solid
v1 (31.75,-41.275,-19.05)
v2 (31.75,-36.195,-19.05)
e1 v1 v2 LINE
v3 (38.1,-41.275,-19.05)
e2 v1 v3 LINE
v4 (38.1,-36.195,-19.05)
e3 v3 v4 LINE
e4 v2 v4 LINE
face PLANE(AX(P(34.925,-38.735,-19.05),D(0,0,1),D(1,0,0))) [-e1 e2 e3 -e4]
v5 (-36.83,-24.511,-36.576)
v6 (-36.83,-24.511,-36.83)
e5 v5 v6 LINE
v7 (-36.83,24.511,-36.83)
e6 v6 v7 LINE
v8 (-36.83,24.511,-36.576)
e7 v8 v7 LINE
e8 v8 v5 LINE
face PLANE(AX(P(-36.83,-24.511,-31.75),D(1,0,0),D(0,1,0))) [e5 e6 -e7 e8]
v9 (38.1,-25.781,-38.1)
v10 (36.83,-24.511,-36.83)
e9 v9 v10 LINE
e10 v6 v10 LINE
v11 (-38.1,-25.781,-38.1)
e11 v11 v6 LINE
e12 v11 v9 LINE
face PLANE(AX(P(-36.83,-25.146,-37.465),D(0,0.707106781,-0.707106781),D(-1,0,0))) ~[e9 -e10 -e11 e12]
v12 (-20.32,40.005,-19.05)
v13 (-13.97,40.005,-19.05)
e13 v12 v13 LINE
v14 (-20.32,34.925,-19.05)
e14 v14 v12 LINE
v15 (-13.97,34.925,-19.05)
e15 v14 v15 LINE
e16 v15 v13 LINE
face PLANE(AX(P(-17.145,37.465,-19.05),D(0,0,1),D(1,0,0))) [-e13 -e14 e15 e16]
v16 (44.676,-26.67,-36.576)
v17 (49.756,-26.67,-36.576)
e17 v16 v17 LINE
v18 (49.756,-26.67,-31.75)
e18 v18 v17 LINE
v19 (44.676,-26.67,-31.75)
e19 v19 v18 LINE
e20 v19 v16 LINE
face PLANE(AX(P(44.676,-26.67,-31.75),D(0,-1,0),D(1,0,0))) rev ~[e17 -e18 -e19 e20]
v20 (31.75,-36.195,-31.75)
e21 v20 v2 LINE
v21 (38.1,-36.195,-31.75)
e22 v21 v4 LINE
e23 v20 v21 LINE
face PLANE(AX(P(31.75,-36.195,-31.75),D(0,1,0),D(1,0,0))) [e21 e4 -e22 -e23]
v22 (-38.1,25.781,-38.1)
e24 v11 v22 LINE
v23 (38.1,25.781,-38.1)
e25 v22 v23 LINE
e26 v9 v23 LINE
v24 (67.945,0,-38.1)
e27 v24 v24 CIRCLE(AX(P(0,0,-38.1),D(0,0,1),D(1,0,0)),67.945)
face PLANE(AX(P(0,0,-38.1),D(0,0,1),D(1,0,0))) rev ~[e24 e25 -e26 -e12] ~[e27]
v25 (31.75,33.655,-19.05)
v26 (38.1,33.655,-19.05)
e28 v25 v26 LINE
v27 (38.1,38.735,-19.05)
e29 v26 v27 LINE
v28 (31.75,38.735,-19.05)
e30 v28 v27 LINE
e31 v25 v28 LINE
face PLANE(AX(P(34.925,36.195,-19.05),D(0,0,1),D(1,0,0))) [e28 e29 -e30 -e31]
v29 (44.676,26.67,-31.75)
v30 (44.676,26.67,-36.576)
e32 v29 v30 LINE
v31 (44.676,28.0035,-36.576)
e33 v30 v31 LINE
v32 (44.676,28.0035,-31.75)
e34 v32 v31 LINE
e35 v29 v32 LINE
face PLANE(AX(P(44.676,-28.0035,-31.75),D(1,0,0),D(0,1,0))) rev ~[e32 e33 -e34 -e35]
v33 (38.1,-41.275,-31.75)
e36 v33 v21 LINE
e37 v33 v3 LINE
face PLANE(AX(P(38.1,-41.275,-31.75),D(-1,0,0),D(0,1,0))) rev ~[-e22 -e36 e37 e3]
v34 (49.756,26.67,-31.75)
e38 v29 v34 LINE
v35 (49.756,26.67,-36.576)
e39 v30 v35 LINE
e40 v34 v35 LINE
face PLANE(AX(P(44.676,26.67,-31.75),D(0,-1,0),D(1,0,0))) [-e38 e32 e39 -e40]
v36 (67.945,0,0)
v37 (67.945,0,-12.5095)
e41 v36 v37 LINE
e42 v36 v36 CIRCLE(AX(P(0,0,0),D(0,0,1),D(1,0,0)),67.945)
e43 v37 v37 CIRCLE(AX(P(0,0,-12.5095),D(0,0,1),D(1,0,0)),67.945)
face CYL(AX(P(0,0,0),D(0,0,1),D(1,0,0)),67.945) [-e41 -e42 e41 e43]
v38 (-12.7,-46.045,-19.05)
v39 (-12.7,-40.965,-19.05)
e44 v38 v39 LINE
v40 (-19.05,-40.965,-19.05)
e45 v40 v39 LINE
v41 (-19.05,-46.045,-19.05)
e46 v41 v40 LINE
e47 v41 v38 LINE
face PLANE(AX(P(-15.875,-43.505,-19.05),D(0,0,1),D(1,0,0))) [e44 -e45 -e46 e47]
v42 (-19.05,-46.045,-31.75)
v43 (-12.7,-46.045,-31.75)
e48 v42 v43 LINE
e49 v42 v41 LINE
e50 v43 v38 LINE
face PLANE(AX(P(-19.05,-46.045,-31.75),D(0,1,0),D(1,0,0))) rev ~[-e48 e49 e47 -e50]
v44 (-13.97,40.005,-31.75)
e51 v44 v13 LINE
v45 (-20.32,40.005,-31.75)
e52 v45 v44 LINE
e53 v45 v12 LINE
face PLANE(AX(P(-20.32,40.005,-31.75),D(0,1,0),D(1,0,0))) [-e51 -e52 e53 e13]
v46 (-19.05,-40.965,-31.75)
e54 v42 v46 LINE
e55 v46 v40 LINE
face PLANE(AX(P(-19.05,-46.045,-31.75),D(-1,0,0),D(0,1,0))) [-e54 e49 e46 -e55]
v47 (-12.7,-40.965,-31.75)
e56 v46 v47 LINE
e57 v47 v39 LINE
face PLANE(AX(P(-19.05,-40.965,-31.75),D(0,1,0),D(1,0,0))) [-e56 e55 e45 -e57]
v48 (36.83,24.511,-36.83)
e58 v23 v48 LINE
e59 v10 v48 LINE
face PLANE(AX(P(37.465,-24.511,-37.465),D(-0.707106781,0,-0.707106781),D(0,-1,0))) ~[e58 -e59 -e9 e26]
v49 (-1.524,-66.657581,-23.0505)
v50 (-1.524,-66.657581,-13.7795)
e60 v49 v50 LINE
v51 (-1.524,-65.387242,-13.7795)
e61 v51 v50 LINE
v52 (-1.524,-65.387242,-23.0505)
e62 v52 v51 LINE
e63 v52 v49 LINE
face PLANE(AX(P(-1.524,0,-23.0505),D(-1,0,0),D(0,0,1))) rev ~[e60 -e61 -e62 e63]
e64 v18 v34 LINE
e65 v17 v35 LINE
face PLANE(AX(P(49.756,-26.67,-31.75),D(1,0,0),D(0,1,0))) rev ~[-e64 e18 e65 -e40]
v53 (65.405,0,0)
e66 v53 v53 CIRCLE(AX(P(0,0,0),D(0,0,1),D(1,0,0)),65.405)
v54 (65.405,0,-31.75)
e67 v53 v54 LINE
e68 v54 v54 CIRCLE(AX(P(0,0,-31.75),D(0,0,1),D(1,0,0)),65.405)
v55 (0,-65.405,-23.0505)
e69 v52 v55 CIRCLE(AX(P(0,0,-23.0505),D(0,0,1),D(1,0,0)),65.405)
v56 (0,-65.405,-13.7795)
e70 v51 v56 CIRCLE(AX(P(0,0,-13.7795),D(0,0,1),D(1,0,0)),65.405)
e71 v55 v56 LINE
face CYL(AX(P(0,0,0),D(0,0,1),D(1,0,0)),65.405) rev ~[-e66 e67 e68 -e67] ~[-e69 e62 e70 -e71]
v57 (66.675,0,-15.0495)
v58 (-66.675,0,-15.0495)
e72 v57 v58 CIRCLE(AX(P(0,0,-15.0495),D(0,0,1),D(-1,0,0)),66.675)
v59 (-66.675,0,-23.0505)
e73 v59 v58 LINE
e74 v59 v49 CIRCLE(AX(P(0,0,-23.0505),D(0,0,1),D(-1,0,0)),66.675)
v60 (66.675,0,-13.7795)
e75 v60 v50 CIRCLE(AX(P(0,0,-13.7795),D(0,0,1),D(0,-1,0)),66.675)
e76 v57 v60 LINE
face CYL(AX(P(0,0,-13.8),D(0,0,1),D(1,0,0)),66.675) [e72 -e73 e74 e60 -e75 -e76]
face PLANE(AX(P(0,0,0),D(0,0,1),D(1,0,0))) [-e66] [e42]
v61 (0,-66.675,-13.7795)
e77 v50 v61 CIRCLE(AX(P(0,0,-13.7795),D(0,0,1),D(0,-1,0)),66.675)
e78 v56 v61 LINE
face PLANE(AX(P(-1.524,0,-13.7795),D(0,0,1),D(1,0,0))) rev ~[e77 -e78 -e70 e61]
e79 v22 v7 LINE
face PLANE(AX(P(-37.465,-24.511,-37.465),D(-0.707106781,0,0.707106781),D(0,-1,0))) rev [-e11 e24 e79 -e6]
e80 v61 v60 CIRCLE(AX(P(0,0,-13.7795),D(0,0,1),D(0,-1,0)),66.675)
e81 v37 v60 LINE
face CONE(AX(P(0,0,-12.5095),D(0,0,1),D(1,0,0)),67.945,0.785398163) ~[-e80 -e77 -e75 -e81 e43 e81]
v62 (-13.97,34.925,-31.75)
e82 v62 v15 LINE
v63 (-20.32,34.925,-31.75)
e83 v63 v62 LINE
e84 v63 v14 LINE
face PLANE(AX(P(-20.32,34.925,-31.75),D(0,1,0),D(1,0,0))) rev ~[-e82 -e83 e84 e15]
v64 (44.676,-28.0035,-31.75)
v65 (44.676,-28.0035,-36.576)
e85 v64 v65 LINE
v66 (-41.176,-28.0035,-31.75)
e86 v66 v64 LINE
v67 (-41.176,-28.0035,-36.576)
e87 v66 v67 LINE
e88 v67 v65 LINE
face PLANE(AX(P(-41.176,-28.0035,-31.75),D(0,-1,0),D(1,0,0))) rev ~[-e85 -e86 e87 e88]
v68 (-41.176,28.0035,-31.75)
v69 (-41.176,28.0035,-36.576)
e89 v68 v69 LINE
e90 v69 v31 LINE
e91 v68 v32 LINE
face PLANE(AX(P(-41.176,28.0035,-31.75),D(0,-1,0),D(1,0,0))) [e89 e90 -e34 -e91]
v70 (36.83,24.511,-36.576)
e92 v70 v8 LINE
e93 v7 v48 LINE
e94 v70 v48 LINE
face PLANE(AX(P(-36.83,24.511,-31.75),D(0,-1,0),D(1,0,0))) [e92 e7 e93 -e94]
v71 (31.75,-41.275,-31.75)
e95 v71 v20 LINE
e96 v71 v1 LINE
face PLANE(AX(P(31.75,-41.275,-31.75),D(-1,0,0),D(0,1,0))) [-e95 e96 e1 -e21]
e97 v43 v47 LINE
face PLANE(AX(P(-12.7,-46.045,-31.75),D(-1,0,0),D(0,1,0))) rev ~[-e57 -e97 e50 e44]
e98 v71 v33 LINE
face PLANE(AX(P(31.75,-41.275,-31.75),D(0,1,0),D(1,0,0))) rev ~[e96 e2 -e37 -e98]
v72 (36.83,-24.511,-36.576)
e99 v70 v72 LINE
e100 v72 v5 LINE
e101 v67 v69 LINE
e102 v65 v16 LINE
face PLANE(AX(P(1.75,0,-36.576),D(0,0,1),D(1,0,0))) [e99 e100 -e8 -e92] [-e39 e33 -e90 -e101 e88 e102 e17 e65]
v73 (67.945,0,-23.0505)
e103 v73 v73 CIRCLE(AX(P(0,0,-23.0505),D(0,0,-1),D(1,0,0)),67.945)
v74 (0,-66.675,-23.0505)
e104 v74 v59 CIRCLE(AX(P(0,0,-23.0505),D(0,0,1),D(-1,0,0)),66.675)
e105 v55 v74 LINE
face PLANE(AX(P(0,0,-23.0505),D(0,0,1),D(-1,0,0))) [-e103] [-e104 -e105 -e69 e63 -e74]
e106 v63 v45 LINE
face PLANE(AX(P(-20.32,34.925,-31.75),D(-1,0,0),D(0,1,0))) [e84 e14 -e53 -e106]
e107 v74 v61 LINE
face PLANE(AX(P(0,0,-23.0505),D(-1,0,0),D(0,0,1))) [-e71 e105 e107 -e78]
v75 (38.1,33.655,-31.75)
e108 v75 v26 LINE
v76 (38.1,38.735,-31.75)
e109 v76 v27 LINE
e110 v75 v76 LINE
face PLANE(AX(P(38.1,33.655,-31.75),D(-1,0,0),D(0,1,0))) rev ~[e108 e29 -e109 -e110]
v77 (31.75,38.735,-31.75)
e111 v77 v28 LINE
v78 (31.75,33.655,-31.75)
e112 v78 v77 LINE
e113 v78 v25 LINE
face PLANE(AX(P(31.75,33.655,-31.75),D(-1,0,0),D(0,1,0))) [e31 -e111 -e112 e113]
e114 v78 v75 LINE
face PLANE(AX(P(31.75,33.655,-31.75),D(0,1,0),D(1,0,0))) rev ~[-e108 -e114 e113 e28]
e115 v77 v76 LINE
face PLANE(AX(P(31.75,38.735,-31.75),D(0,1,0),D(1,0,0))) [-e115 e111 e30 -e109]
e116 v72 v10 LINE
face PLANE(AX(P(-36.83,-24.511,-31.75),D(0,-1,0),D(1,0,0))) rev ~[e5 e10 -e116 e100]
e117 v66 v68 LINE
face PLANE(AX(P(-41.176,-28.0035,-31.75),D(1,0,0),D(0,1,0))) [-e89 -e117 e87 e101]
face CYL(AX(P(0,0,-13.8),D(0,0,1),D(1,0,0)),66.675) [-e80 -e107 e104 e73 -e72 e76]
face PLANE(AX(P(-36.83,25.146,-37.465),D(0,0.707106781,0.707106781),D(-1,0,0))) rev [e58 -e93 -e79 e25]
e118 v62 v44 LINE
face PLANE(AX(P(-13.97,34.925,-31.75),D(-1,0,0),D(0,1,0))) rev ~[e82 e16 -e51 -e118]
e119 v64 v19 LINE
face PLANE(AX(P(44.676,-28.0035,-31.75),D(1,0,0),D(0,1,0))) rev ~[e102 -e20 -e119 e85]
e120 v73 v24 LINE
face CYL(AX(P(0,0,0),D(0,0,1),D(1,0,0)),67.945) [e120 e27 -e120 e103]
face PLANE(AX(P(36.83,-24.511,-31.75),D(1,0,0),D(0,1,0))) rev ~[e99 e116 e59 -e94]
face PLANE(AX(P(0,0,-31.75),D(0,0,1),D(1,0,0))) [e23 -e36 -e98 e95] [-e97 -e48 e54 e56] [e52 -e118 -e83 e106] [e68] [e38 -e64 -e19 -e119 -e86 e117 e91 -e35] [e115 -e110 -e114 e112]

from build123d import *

# Parameters (mm, degrees)
F0_R        = 67.945
F1_DEPTH    = 38.1
F2_R        = 65.405
F3_DEPTH    = 31.75
F5_W        = 2.54
F5_H        = 8.001
F7_S5_R     = 66.675
F7_T6_DEPTH = 98
F8_W        = 73.66
F8_H        = 49.022
F9_DEPTH    = 6.351
F10_W       = 85.852
F10_H       = 56.007
F11_DEPTH   = 4.826
F12_W       = 5.08
F12_H       = 53.34
F13_DEPTH   = 4.826
F14_SIZE    = 1.27
F15_W       = 1.524
F15_H       = 9.271
F16_DEPTH   = 67.946
F17_W       = 6.35
F17_H       = 5.08
F18_DEPTH   = 12.7


# Not quite as in the source:
# - a fillet or chamfer that OpenCascade refuses, or shapes differently, is made with other operations: its cross-section is extruded or revolved along the edge and cut away or added


with BuildPart() as f1:
    # F0 (on Top) → F1 (new body)
    with BuildSketch(Plane.XY):
        Circle(F0_R)
    extrude(amount=-F1_DEPTH)

    # F2 (on face) → F3 (cut)
    with BuildSketch(Plane.XY):
        Circle(F2_R)
    extrude(amount=-F3_DEPTH, mode=Mode.SUBTRACT)

    # F5 (on Front) → F6 (revolve, cut)
    with BuildSketch(Plane.XZ):
        with Locations((-67.945, -19.05)):
            Rectangle(F5_W, F5_H)
    revolve(axis=Axis((0, 0, 0), (0, 0, 1)), mode=Mode.SUBTRACT)

    # F7: chamfer of 2.54 on 1 edges, made by hand


with BuildPart() as f7_tool2:
    # F7_s3 → F7_t4 (revolve)
    with BuildSketch(Plane.XZ):
        Polygon((67.945, -12.5095), (65.405, -15.0495), (67.945, -15.0495), align=None)
    revolve(axis=Axis((0, 0, -15.0495), (0, 0, 1)))

    # F7_s5 → F7_t6 (cut, symmetric)
    with BuildSketch(Plane.XY.offset(-13.8)):
        Circle(F7_S5_R)
    extrude(amount=F7_T6_DEPTH, both=True, mode=Mode.SUBTRACT)


with BuildPart() as f1_1:
    add(f1.part)

    # F7_t1: cut F7_tool2
    add(f7_tool2.part, mode=Mode.SUBTRACT)

    # F8 (on face) → F9 (cut, through all)
    with BuildSketch(Plane.XY.offset(-31.75)):
        Rectangle(F8_W, F8_H)
    extrude(amount=-F9_DEPTH, mode=Mode.SUBTRACT)

    # F10 (on face) → F11 (cut, through all)
    with BuildSketch(Plane.XY.offset(-31.75)):
        with Locations((1.75, 0)):
            Rectangle(F10_W, F10_H)
    extrude(amount=-F11_DEPTH, mode=Mode.SUBTRACT)

    # F12 (on face) → F13 (cut, through all)
    with BuildSketch(Plane.XY.offset(-31.75)):
        with Locations((47.216, 0)):
            Rectangle(F12_W, F12_H)
    extrude(amount=-F13_DEPTH, mode=Mode.SUBTRACT)

    # F14
    f14_edges = [f1_1.edges().sort_by_distance(p)[0] for p in [
        (0, 24.511, -38.1),
        (-36.83, 0, -38.1),
        (36.83, 0, -38.1),
        (0, -24.511, -38.1),
    ]]
    chamfer(f14_edges, length=F14_SIZE)

    # F15 (on Front) → F16 (cut, through all)
    with BuildSketch(Plane.XZ):
        with Locations((-0.762, -18.415)):
            Rectangle(F15_W, F15_H)
    extrude(amount=F16_DEPTH, mode=Mode.SUBTRACT)

    # F17 (on face) → F18 (join)
    with BuildSketch(Plane.XY.offset(-31.75)):
        with Locations((-17.145, 37.465)):
            Rectangle(F17_W, F17_H)
        with Locations((34.925, 36.195)):
            Rectangle(F17_W, F17_H)
        with Locations((-15.875, -43.505)):
            Rectangle(F17_W, F17_H)
        with Locations((34.925, -38.735)):
            Rectangle(F17_W, F17_H)
    extrude(amount=F18_DEPTH)


solid = f1_1.part
